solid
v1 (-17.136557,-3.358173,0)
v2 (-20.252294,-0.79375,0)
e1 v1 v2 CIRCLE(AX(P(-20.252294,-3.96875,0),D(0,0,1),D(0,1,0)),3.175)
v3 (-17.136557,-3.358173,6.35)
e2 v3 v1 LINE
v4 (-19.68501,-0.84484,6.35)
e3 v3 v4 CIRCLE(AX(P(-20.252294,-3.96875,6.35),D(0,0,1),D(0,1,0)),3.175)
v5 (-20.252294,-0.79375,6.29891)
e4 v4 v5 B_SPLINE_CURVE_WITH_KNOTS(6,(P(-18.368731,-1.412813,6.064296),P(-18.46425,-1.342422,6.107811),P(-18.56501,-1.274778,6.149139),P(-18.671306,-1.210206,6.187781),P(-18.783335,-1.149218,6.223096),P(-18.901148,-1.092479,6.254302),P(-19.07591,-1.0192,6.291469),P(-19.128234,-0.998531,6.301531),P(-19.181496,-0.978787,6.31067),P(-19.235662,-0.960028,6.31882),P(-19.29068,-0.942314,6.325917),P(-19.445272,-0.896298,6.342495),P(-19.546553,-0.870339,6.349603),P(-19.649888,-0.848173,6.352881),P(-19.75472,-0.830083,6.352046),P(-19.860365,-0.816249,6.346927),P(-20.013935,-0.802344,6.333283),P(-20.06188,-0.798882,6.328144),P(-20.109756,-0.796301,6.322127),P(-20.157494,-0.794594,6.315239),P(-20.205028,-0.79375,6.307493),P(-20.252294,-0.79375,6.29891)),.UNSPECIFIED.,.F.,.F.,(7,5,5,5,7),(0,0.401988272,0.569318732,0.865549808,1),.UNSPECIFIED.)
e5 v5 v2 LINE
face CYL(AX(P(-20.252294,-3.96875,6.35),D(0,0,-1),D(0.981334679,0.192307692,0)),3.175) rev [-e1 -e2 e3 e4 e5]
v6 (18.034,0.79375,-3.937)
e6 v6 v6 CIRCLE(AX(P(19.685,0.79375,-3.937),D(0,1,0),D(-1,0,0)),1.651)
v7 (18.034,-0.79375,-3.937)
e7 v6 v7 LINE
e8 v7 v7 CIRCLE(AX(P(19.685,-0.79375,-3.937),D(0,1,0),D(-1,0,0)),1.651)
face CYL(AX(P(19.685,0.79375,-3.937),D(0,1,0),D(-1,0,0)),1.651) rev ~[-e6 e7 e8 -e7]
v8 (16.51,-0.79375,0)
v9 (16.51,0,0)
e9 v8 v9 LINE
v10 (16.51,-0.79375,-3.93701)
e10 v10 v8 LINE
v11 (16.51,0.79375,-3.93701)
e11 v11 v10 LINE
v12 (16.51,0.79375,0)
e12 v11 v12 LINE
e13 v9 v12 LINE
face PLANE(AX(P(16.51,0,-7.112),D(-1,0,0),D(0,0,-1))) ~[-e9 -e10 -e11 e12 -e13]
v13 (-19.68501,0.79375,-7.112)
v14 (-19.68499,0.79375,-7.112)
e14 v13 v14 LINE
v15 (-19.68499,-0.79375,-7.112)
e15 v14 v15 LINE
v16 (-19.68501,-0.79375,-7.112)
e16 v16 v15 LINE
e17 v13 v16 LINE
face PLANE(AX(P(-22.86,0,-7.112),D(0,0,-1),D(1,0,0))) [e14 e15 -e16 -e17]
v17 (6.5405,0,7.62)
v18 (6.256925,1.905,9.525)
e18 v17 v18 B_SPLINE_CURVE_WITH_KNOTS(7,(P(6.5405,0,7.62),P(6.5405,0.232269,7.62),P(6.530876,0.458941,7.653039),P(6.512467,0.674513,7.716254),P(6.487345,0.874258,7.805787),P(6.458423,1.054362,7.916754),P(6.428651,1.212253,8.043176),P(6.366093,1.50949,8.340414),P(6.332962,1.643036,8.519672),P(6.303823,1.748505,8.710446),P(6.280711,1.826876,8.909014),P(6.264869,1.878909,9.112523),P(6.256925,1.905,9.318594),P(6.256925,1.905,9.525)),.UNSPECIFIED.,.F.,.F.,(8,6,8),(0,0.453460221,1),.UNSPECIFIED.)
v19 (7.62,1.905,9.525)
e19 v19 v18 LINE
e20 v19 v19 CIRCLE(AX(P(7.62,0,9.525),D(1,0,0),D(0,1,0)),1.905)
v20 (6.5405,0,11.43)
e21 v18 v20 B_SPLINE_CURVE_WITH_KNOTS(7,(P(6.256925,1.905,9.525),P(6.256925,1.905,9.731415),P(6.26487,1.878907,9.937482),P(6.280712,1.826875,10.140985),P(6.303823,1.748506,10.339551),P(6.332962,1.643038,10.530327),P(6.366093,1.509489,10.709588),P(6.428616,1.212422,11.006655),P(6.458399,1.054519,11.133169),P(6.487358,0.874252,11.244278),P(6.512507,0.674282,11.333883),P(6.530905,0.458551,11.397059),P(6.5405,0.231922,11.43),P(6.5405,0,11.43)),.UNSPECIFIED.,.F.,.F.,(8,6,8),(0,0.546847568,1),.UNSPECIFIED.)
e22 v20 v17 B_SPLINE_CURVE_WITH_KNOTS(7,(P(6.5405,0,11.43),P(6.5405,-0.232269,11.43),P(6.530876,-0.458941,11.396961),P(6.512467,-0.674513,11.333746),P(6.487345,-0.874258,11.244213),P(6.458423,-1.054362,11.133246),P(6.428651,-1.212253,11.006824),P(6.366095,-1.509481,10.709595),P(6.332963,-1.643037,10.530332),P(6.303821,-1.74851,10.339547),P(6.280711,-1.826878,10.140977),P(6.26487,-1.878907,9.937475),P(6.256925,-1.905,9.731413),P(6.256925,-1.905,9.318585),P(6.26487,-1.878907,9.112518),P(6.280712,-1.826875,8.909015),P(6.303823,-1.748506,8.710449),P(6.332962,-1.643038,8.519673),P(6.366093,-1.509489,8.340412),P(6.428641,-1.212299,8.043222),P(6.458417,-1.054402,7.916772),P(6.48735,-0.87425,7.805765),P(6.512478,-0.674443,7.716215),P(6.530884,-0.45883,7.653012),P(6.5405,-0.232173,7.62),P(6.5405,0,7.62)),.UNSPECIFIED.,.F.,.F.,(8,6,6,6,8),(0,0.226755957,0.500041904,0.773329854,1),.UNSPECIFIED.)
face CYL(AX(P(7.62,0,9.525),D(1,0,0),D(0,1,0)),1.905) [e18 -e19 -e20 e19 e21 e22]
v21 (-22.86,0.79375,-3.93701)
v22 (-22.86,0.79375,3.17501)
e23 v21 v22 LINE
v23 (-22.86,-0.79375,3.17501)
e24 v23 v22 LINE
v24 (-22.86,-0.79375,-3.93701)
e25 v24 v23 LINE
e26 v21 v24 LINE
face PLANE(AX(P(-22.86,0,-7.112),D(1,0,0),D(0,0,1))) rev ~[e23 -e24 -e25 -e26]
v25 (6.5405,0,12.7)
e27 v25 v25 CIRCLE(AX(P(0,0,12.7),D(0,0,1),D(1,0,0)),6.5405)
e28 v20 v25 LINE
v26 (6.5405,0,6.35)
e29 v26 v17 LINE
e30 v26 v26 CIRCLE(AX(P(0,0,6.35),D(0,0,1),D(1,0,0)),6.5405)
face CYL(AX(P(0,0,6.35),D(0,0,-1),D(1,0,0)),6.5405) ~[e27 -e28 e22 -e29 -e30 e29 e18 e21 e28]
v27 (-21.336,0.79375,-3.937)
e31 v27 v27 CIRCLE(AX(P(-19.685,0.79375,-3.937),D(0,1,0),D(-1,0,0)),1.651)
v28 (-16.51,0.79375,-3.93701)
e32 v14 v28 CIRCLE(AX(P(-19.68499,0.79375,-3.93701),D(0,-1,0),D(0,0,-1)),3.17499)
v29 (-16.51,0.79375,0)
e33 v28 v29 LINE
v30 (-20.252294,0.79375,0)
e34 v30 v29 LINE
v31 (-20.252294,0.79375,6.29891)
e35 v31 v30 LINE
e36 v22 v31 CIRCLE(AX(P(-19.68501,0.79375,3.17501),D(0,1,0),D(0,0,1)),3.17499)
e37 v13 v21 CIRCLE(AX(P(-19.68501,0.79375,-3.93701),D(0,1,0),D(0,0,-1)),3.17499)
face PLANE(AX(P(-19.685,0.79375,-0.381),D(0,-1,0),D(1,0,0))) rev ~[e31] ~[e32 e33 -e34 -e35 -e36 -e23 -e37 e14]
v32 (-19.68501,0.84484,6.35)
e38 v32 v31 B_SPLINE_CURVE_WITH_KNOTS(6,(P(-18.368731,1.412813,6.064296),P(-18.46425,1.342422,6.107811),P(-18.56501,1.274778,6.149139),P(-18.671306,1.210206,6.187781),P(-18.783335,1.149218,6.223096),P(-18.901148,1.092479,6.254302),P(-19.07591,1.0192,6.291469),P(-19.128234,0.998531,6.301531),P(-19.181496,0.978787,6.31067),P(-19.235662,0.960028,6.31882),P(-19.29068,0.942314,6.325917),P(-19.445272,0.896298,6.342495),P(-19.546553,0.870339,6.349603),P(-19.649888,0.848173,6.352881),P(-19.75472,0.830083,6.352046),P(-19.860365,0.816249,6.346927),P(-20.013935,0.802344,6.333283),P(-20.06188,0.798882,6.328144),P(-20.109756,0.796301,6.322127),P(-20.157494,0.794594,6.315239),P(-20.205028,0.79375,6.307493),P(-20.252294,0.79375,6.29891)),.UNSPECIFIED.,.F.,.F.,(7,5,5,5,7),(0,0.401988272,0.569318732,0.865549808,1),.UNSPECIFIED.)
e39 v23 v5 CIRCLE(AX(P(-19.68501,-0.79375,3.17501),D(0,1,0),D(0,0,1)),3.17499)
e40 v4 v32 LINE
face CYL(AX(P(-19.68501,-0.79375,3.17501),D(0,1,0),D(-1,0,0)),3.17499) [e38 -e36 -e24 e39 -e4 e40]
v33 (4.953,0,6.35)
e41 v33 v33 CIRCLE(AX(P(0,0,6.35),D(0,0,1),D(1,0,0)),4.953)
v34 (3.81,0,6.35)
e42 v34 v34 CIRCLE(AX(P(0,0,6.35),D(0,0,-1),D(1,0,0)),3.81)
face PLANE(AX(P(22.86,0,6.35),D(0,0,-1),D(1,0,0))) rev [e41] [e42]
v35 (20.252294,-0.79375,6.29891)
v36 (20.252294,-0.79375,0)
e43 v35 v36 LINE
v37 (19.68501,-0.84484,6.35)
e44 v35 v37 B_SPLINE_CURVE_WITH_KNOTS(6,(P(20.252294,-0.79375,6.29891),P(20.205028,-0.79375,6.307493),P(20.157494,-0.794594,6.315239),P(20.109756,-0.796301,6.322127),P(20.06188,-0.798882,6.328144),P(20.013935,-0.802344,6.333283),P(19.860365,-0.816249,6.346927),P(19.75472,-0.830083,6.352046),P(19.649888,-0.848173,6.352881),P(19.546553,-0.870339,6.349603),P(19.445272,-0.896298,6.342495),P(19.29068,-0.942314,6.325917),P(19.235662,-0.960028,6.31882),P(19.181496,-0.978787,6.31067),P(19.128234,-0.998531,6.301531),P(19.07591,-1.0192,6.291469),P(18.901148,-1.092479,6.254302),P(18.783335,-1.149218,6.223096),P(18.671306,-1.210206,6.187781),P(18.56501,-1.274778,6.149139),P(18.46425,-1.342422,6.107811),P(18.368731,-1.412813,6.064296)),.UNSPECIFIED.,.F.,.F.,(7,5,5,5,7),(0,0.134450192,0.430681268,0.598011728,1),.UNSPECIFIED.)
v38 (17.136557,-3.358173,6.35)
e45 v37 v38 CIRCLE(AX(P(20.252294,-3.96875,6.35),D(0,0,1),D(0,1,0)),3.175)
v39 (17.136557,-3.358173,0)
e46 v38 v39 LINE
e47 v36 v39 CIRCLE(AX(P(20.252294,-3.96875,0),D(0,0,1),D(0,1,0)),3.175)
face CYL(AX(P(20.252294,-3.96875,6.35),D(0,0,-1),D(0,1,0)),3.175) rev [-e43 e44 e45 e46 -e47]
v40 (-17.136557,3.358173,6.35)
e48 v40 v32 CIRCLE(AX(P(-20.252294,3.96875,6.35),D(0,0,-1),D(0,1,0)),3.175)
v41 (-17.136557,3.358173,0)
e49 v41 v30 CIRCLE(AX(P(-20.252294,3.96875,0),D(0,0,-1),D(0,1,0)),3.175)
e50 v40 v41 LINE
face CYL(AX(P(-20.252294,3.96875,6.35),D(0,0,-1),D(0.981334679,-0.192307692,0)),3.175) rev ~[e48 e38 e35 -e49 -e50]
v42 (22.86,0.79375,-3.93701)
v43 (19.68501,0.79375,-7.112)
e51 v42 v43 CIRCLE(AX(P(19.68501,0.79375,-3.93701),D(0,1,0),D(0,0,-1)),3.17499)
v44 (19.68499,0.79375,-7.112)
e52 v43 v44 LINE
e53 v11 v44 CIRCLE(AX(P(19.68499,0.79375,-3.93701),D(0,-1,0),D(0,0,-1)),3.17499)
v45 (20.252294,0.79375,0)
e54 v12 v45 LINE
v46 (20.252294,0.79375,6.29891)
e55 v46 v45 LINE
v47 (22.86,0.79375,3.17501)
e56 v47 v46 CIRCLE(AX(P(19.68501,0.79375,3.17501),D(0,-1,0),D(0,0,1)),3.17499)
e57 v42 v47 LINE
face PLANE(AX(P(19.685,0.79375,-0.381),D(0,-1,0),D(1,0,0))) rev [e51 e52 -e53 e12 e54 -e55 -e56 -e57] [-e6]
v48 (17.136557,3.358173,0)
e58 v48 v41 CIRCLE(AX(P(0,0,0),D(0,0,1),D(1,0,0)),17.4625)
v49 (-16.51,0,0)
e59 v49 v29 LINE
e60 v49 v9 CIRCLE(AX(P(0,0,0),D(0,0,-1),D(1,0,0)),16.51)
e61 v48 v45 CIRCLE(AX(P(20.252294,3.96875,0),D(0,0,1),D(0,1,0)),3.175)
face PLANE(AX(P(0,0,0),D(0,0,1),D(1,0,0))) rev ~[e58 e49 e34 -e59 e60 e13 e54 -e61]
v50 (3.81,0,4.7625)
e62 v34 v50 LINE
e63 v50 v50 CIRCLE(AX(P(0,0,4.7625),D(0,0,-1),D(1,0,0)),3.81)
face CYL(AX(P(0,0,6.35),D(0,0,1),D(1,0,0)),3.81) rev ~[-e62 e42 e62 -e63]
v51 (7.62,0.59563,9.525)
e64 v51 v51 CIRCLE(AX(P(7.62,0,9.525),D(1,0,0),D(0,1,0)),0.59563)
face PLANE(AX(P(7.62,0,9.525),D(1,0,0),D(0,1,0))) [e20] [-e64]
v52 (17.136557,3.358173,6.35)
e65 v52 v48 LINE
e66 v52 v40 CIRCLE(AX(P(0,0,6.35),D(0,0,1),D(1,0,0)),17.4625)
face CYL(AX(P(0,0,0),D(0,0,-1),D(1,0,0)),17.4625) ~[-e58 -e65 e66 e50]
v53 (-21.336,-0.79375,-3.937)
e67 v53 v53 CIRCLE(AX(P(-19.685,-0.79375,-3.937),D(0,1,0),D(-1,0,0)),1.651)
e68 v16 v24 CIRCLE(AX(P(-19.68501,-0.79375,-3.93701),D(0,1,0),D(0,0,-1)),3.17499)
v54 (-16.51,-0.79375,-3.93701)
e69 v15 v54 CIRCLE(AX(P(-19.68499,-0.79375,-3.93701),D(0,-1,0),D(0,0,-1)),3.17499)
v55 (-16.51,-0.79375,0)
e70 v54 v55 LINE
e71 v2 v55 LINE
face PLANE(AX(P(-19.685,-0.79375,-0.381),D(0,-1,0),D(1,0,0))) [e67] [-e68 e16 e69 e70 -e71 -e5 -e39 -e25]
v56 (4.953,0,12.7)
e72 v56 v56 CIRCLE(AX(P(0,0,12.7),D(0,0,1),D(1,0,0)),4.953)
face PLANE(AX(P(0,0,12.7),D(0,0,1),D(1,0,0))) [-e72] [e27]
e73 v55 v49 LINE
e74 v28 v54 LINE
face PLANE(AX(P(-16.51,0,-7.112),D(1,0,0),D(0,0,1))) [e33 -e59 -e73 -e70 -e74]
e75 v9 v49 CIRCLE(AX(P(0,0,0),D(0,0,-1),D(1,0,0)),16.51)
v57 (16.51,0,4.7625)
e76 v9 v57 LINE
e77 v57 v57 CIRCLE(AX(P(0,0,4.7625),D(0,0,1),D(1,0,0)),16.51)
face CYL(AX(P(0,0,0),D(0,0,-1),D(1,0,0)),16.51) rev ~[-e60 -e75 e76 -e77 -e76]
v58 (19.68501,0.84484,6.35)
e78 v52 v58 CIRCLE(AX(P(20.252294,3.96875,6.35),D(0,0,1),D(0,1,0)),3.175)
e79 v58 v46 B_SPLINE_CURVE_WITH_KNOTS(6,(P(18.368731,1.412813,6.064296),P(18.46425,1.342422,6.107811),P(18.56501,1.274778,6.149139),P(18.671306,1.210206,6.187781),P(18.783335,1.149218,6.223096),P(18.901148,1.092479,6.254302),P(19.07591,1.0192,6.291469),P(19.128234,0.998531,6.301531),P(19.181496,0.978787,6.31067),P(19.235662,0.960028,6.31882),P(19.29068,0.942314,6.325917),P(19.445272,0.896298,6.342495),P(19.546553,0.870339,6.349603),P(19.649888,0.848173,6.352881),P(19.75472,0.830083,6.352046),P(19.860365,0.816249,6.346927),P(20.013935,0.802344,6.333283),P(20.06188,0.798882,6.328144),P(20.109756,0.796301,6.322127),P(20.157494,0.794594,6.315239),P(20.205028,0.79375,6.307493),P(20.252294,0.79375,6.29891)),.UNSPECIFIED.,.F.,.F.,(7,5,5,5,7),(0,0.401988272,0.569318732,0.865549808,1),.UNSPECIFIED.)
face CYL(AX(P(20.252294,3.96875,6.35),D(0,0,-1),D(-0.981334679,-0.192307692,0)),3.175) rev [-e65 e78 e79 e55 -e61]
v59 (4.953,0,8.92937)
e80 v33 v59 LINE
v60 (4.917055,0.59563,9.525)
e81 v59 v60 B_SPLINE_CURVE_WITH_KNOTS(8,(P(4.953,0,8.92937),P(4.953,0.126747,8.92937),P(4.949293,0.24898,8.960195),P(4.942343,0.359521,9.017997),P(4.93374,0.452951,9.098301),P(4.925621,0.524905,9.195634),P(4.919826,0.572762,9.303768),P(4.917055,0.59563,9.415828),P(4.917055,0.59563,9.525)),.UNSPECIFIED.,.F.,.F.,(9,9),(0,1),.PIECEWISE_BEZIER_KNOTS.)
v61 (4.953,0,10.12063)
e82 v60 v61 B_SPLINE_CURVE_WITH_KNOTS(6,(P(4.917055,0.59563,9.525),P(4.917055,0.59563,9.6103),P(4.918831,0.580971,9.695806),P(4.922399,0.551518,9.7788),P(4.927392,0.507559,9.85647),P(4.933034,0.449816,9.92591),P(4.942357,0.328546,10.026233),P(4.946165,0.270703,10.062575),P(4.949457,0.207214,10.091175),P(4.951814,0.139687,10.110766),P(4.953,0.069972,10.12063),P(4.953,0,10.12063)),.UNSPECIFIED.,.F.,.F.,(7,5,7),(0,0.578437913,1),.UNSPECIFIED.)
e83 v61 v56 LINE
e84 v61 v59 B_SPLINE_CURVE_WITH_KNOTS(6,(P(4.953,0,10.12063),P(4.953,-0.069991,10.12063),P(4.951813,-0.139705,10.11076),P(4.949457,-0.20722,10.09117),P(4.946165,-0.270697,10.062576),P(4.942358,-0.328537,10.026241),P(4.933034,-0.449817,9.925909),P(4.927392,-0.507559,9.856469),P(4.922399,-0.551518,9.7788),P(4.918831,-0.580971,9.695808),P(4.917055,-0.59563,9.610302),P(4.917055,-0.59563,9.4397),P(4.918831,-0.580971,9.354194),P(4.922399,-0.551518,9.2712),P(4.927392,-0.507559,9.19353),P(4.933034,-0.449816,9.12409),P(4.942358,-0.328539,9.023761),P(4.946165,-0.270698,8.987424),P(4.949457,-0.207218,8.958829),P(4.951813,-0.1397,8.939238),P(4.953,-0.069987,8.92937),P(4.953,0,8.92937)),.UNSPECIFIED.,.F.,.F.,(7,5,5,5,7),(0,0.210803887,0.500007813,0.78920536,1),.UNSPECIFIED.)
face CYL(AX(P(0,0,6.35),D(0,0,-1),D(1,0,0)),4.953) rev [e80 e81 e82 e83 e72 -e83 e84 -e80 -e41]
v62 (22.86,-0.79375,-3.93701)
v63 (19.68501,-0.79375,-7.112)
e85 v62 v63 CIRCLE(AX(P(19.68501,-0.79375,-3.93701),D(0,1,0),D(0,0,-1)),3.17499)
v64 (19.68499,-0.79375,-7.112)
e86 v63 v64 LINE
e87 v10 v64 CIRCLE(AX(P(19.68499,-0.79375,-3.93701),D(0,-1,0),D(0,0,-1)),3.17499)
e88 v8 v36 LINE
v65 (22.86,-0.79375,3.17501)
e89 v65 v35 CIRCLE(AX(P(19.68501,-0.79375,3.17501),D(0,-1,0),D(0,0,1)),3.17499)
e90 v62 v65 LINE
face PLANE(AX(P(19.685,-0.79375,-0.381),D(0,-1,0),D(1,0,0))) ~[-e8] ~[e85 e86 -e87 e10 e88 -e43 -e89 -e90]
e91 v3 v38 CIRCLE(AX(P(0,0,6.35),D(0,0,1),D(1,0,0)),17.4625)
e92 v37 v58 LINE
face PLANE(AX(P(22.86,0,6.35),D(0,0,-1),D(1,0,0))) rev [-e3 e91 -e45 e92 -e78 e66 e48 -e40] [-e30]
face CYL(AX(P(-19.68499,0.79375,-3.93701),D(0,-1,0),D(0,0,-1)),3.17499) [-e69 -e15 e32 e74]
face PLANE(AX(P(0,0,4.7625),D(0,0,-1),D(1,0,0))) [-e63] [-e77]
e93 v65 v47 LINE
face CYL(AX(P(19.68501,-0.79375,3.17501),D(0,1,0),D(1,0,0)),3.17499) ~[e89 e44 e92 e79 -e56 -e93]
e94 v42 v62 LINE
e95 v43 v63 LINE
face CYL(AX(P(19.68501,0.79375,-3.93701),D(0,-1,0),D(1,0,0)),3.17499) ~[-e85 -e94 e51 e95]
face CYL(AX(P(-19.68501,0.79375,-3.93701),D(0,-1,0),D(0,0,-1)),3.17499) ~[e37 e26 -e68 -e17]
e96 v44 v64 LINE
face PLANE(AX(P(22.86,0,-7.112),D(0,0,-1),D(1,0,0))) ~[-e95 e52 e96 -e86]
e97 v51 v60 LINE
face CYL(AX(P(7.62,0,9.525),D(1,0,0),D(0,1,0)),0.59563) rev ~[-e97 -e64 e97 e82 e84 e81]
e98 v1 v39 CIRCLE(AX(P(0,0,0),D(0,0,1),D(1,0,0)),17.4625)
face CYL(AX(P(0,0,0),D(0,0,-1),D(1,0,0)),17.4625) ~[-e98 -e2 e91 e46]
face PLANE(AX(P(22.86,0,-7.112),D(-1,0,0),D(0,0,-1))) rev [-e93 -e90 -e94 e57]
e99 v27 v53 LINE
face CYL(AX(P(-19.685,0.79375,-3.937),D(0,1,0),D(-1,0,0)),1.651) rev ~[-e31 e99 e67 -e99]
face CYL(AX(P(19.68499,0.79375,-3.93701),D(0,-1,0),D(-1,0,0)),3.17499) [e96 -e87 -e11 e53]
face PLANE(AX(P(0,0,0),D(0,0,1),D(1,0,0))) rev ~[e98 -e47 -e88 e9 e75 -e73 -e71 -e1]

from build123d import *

# Parameters (mm, degrees)
F0_R      = 17.4625
F1_DEPTH  = 6.35
F2_R      = 16.51
F3_DEPTH  = 4.7625
F4_R      = 3.81
F5_DEPTH  = 6.351
F6_W      = 6.35
F6_H      = 13.462
F7_DEPTH  = 0.79375
F9_R      = 3.17499
F10_R     = 3.175
F11_R     = 1.651
F12_DEPTH = 18.25725
F13_R     = 6.5405
F13_R_2   = 4.953
F14_DEPTH = 6.35
F16_R     = 1.905
F17_DEPTH = 1.3630747169
F18_R     = 0.59563
F19_DEPTH = 2.7039446902


# Not quite as in the source:
# - a fillet or chamfer is up to 0.001 mm smaller than in the source, because OpenCascade refuses the exact size


with BuildPart() as f1:
    # F0 (on Top) → F1 (new body)
    with BuildSketch(Plane.XY):
        Circle(F0_R)
    extrude(amount=F1_DEPTH)

    # F2 (on face) → F3 (cut)
    with BuildSketch(Plane(origin=(0, 0, 0), x_dir=(1, 0, 0), z_dir=(0, 0, -1))):
        Circle(F2_R)
    extrude(amount=-F3_DEPTH, mode=Mode.SUBTRACT)

    # F4 (on face) → F5 (cut, through all)
    with BuildSketch(Plane.XY.offset(6.35)):
        Circle(F4_R)
    extrude(amount=-F5_DEPTH, mode=Mode.SUBTRACT)

    # F6 (on Front) → F7 (join, symmetric)
    with BuildSketch(Plane.XZ):
        with Locations((-19.685, -0.381)):
            Rectangle(F6_W, F6_H)
    extrude(amount=F7_DEPTH, both=True)

    # F8: F1 across plane


with BuildPart() as f1_1:
    add(f1.part)
    add(f1.part.mirror(Plane.YZ))

    # F9 (radius 3.175 in the source; OpenCascade refuses exactly that, so slightly less here)
    f9_edges = [f1_1.edges().sort_by_distance(p)[0] for p in [
        (-22.86, 0, 6.35),
        (-22.86, 0, -7.112),
        (-16.51, 0, -7.112),
        (22.86, 0, 6.35),
        (22.86, 0, -7.112),
        (16.51, 0, -7.112),
    ]]
    fillet(f9_edges, radius=F9_R)

    # F10 (call 1 of 4: OpenCascade refuses the feature's edges together)
    f10_edges = [f1_1.edges().sort_by_distance(p)[0] for p in [
        (-17.444451, -0.79375, 3.175),
    ]]
    fillet(f10_edges, radius=F10_R)

    # F10#2 (call 2 of 4)
    f10_2_edges = [f1_1.edges().sort_by_distance(p)[0] for p in [
        (-17.444451, 0.79375, 3.175),
    ]]
    fillet(f10_2_edges, radius=F10_R)

    # F10#3 (call 3 of 4)
    f10_3_edges = [f1_1.edges().sort_by_distance(p)[0] for p in [
        (17.444451, -0.79375, 3.175),
    ]]
    fillet(f10_3_edges, radius=F10_R)

    # F10#4 (call 4 of 4)
    f10_4_edges = [f1_1.edges().sort_by_distance(p)[0] for p in [
        (17.444451, 0.79375, 3.175),
    ]]
    fillet(f10_4_edges, radius=F10_R)

    # F11 (on face) → F12 (cut, through all)
    with BuildSketch(Plane(origin=(0, 0.79375, 0), x_dir=(-1, 0, 0), z_dir=(0, 1, 0))):
        with Locations((19.685, -3.937)):
            Circle(F11_R)
        with Locations((-19.685, -3.937)):
            Circle(F11_R)
    extrude(amount=-F12_DEPTH, mode=Mode.SUBTRACT)

    # F13 (on face) → F14 (join)
    with BuildSketch(Plane.XY.offset(6.35)):
        Circle(F13_R)
        Circle(F13_R_2, mode=Mode.SUBTRACT)
    extrude(amount=F14_DEPTH)

    # F16 (on offset) → F17 (join, through all)
    with BuildSketch(Plane.YZ.offset(7.62)):
        with Locations((0, 9.525)):
            Circle(F16_R)
    extrude(amount=-F17_DEPTH)

    # F18 (on face) → F19 (cut, through all)
    with BuildSketch(Plane.YZ.offset(7.62)):
        with Locations((0, 9.525)):
            Circle(F18_R)
    extrude(amount=-F19_DEPTH, mode=Mode.SUBTRACT)


solid = f1_1.part
